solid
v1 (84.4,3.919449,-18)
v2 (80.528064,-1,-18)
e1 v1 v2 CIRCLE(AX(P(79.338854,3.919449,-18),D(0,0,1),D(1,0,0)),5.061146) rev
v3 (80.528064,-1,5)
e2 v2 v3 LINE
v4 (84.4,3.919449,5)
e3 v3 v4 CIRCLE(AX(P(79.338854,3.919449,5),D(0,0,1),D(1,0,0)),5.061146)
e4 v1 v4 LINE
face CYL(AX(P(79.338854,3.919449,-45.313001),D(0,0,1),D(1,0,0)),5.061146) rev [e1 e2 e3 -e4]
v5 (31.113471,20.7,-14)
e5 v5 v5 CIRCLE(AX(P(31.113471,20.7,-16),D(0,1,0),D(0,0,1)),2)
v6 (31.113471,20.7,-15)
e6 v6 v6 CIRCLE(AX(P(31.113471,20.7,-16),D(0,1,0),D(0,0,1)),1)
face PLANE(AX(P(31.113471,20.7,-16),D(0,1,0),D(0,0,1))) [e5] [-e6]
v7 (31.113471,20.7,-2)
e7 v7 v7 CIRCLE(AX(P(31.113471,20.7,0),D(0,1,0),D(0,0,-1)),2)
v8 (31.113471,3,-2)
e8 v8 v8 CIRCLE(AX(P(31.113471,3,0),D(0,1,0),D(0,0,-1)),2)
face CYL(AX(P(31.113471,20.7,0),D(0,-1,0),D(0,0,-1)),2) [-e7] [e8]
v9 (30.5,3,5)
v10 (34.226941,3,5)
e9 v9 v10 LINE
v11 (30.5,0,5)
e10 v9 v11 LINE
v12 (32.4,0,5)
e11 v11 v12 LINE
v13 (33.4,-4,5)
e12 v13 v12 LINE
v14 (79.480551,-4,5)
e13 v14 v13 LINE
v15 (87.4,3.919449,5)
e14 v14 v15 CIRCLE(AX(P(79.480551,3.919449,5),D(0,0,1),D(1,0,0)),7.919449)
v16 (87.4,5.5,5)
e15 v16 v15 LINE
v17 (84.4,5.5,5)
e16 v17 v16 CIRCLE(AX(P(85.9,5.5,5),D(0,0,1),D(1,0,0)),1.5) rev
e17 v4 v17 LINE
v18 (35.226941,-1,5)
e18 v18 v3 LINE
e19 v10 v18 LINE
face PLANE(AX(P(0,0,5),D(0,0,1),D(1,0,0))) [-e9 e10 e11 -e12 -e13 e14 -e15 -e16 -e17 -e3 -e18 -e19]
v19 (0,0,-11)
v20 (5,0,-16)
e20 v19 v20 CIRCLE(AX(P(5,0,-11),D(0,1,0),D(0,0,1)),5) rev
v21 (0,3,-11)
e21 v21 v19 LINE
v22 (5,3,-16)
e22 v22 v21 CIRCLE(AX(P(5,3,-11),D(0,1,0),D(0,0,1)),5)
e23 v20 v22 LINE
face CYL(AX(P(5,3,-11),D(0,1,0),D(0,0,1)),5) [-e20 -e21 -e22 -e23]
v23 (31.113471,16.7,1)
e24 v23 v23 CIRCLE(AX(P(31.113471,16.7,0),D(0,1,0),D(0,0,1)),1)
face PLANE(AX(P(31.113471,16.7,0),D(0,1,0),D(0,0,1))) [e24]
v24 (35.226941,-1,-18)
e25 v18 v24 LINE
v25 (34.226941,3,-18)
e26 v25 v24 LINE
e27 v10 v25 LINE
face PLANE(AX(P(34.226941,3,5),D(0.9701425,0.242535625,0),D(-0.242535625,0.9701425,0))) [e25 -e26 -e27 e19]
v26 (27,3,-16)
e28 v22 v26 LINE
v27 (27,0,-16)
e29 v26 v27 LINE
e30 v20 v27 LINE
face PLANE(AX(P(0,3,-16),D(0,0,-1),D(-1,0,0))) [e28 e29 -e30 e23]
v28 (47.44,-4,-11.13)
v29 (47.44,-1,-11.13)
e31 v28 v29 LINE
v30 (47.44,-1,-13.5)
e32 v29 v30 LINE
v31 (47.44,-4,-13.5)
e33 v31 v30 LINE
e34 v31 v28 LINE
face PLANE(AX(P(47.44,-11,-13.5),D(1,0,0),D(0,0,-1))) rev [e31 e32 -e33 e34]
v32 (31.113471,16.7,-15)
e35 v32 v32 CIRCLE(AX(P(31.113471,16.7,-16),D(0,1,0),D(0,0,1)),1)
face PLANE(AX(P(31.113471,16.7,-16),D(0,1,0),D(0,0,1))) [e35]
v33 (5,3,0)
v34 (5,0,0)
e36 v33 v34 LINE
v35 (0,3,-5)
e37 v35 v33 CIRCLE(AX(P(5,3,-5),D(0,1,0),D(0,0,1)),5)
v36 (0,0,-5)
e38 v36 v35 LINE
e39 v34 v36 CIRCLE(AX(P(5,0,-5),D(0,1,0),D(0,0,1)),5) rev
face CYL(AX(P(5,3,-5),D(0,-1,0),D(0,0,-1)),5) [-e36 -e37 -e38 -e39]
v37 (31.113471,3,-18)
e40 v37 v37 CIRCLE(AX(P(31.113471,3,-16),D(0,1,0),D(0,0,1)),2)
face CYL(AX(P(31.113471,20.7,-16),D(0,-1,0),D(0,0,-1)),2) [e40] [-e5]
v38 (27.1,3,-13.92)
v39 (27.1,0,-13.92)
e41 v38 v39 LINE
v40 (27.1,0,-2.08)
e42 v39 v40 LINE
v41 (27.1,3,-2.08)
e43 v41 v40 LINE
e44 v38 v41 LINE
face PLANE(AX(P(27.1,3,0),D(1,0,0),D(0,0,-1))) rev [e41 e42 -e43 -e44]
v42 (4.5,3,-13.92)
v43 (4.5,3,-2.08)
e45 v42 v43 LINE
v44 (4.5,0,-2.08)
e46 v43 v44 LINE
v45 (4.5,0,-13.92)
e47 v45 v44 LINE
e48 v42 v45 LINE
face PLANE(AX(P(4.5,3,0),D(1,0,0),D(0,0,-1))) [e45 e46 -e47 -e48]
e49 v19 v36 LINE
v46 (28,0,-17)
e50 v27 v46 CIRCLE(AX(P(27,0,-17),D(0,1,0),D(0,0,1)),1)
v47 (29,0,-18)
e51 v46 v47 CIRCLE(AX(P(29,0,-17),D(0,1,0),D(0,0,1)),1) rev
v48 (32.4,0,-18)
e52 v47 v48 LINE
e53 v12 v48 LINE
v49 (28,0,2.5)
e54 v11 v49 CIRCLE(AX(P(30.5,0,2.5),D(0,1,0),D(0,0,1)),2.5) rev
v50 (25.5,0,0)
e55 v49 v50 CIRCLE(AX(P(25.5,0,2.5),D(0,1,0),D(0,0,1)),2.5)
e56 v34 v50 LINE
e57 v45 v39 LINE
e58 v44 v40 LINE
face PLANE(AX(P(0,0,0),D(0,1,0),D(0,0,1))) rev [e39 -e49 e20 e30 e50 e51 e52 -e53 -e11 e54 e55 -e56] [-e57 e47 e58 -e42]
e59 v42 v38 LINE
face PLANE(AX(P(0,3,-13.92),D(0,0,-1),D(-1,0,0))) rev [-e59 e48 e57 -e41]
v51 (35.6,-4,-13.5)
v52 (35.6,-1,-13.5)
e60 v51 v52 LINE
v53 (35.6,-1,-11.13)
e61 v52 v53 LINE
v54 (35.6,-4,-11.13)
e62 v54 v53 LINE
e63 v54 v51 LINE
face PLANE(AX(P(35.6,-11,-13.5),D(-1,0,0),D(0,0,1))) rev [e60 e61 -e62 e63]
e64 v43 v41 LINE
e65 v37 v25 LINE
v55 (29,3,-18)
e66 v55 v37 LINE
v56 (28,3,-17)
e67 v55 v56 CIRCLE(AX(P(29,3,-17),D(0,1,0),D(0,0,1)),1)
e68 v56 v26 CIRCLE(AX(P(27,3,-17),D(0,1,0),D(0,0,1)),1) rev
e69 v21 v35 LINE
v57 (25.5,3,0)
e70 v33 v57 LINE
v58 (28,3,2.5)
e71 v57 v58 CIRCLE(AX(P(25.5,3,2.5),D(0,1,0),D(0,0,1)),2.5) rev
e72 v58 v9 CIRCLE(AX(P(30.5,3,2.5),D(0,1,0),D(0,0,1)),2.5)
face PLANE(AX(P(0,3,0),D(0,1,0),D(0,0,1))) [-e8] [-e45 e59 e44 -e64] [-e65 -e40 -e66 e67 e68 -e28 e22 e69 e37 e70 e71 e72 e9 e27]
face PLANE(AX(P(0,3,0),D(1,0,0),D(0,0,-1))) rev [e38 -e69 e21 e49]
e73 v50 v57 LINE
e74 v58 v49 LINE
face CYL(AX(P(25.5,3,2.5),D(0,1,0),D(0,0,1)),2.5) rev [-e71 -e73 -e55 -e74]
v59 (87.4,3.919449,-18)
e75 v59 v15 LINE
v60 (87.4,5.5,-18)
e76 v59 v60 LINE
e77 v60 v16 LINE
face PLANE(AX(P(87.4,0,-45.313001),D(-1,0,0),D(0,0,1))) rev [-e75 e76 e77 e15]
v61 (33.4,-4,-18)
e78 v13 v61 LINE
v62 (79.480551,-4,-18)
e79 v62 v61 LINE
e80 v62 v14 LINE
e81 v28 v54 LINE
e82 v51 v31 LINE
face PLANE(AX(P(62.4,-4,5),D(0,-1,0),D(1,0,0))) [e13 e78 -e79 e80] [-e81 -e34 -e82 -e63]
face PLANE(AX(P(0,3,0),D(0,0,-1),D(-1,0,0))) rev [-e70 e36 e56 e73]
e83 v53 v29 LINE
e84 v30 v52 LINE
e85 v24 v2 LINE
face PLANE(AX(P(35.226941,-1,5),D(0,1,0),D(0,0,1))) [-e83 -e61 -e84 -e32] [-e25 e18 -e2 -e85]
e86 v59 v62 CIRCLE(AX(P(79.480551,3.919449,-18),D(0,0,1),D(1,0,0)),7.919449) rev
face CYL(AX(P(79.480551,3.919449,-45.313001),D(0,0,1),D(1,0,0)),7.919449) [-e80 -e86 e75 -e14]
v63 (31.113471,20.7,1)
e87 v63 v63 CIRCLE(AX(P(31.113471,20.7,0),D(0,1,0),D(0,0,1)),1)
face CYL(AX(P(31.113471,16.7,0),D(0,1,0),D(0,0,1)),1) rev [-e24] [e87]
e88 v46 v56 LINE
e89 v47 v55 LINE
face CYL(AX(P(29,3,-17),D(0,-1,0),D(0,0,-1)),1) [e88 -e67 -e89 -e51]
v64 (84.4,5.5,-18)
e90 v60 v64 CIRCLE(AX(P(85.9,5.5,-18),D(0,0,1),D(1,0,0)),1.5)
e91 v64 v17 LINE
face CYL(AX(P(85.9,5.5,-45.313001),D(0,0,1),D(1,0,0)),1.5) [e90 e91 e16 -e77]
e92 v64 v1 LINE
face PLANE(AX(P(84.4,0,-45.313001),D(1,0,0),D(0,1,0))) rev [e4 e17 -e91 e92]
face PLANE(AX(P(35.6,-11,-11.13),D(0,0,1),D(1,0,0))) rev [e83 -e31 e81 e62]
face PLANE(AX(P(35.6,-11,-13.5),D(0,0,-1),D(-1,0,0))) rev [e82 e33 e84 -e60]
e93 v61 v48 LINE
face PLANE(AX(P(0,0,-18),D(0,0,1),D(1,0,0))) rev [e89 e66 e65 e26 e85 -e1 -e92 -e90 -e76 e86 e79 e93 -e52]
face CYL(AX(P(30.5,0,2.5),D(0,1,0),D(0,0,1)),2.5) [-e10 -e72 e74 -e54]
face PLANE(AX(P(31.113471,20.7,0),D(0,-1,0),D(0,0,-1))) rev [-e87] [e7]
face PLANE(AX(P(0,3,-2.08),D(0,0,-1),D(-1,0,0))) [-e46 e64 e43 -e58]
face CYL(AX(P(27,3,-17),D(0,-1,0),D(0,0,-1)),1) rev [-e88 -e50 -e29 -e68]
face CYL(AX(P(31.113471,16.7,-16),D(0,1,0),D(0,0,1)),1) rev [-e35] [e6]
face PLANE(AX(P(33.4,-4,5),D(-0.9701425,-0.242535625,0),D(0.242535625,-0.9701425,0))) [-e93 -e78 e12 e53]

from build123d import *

# Parameters (mm, degrees)
SKETCH1_W               = 28
SKETCH1_H               = 16
SKETCH1_W_2             = 22.6
SKETCH1_H_2             = 11.84
BOSS_EXTRUDE1_DEPTH     = 3
BOSS_EXTRU_1_DEPTH      = 5
BOSS_EXTRU_1_DEPTH_BACK = 18
ESQUISSE6_R             = 2
BOSS_EXTRU_3_DEPTH      = 17.7
ESQUISSE7_R             = 1
ENL_V_MAT_EXTRU_3_DEPTH = 4
ESQUISSE8_W             = 11.84
ESQUISSE8_H             = 2.37
ENL_V_MAT_EXTRU_4_DEPTH = 10
CONG_1_R                = 1
CONG_3_R                = 5
CONG_4_R                = 2.5
BOSS_EXTRUDE2_DEPTH     = 23


with BuildPart() as part:
    # Sketch1 → Boss-Extrude1 (new body)
    with BuildSketch(Plane(origin=(0, 0, 0), x_dir=(1, 0, 0), z_dir=(0, 1, 0))):
        with Locations((14, 8)):
            Rectangle(SKETCH1_W, SKETCH1_H)
        with Locations((15.8, 8)):
            Rectangle(SKETCH1_W_2, SKETCH1_H_2, mode=Mode.SUBTRACT)
    extrude(amount=BOSS_EXTRUDE1_DEPTH)

    # Esquisse1 → Boss.-Extru.1 (add, two sides: drawn at the far end of the back side and taken through both)
    with BuildSketch(Plane.XY.offset(-BOSS_EXTRU_1_DEPTH_BACK)):
        Polygon((34.226941016, 3), (35.226941016, -1), (62.4, -1), (62.4, -4), (33.4, -4), (32.4, 0), (28, 0), (28, 3), align=None)
    extrude(amount=BOSS_EXTRU_1_DEPTH + BOSS_EXTRU_1_DEPTH_BACK)

    # Esquisse6 → Boss.-Extru.3 (add)
    with BuildSketch(Plane(origin=(0, 3, 0), x_dir=(1, 0, 0), z_dir=(0, 1, 0))):
        with Locations(Location((31.113470508, 0, 0), (0, 0, 90))):
            Circle(ESQUISSE6_R)
        with Locations(Location((31.113470508, 16, 0), (0, 0, 90))):
            Circle(ESQUISSE6_R)
    extrude(amount=BOSS_EXTRU_3_DEPTH)

    # Esquisse7 → Enlèv. mat.-Extru.3 (cut)
    with BuildSketch(Plane(origin=(0, 20.7, 0), x_dir=(1, 0, 0), z_dir=(0, 1, 0))):
        with Locations(Location((31.113470508, 16, 0), (0, 0, 270))):
            Circle(ESQUISSE7_R)
        with Locations(Location((31.113470508, 0, 0), (0, 0, 270))):
            Circle(ESQUISSE7_R)
    extrude(amount=-ENL_V_MAT_EXTRU_3_DEPTH, mode=Mode.SUBTRACT)

    # Esquisse8 → Enlèv. mat.-Extru.4 (cut)
    with BuildSketch(Plane(origin=(0, -1, 0), x_dir=(1, 0, 0), z_dir=(0, 1, 0))):
        with Locations((41.52, 12.315)):
            Rectangle(ESQUISSE8_W, ESQUISSE8_H)
    extrude(amount=-ENL_V_MAT_EXTRU_4_DEPTH, mode=Mode.SUBTRACT)

    # Congé1
    cong_1_edges = [part.edges().sort_by_distance(p)[0] for p in [
        (28, 1.5, -16),
    ]]
    fillet(cong_1_edges, radius=CONG_1_R)
    cong_1_2_edges = [part.edges().sort_by_distance(p)[0] for p in [
        (28, 1.5, -18),
    ]]
    fillet(cong_1_2_edges, radius=CONG_1_R - 0.0001)  # a hair under: the kernel refuses the full size

    # Congé3
    cong_3_edges = [part.edges().sort_by_distance(p)[0] for p in [
        (0, 1.5, 0),
        (0, 1.5, -16),
    ]]
    fillet(cong_3_edges, radius=CONG_3_R)

    # Congé4
    cong_4_edges = [part.edges().sort_by_distance(p)[0] for p in [
        (28, 1.5, 0),
    ]]
    fillet(cong_4_edges, radius=CONG_4_R)
    cong_4_2_edges = [part.edges().sort_by_distance(p)[0] for p in [
        (28, 1.5, 5),
    ]]
    fillet(cong_4_2_edges, radius=CONG_4_R - 0.0001)  # a hair under: the kernel refuses the full size

    # Sketch3 → Boss-Extrude2 (add)
    with BuildSketch(Plane.XY.offset(5)):
        with BuildLine():
            Line((62.4, -1), (62.4, -4))
            Line((62.4, -4), (79.480551105, -4))
            ThreePointArc((79.480551105, -4), (85.080447122, -1.680447122), (87.4, 3.919448895))
            Line((87.4, 3.919448895), (87.4, 5.5))
            ThreePointArc((87.4, 5.5), (85.9, 7), (84.4, 5.5))
            Line((84.4, 5.5), (84.4, 3.919448895))
            ThreePointArc((84.4, 3.919448895), (83.315910874, 0.78923852), (80.528063722, -1))
            Line((80.528063722, -1), (79.4, -1))
            Line((79.4, -1), (71.856339273, -1))
            Line((71.856339273, -1), (62.4, -1))
        make_face()
    extrude(amount=-BOSS_EXTRUDE2_DEPTH)


solid = part.part
